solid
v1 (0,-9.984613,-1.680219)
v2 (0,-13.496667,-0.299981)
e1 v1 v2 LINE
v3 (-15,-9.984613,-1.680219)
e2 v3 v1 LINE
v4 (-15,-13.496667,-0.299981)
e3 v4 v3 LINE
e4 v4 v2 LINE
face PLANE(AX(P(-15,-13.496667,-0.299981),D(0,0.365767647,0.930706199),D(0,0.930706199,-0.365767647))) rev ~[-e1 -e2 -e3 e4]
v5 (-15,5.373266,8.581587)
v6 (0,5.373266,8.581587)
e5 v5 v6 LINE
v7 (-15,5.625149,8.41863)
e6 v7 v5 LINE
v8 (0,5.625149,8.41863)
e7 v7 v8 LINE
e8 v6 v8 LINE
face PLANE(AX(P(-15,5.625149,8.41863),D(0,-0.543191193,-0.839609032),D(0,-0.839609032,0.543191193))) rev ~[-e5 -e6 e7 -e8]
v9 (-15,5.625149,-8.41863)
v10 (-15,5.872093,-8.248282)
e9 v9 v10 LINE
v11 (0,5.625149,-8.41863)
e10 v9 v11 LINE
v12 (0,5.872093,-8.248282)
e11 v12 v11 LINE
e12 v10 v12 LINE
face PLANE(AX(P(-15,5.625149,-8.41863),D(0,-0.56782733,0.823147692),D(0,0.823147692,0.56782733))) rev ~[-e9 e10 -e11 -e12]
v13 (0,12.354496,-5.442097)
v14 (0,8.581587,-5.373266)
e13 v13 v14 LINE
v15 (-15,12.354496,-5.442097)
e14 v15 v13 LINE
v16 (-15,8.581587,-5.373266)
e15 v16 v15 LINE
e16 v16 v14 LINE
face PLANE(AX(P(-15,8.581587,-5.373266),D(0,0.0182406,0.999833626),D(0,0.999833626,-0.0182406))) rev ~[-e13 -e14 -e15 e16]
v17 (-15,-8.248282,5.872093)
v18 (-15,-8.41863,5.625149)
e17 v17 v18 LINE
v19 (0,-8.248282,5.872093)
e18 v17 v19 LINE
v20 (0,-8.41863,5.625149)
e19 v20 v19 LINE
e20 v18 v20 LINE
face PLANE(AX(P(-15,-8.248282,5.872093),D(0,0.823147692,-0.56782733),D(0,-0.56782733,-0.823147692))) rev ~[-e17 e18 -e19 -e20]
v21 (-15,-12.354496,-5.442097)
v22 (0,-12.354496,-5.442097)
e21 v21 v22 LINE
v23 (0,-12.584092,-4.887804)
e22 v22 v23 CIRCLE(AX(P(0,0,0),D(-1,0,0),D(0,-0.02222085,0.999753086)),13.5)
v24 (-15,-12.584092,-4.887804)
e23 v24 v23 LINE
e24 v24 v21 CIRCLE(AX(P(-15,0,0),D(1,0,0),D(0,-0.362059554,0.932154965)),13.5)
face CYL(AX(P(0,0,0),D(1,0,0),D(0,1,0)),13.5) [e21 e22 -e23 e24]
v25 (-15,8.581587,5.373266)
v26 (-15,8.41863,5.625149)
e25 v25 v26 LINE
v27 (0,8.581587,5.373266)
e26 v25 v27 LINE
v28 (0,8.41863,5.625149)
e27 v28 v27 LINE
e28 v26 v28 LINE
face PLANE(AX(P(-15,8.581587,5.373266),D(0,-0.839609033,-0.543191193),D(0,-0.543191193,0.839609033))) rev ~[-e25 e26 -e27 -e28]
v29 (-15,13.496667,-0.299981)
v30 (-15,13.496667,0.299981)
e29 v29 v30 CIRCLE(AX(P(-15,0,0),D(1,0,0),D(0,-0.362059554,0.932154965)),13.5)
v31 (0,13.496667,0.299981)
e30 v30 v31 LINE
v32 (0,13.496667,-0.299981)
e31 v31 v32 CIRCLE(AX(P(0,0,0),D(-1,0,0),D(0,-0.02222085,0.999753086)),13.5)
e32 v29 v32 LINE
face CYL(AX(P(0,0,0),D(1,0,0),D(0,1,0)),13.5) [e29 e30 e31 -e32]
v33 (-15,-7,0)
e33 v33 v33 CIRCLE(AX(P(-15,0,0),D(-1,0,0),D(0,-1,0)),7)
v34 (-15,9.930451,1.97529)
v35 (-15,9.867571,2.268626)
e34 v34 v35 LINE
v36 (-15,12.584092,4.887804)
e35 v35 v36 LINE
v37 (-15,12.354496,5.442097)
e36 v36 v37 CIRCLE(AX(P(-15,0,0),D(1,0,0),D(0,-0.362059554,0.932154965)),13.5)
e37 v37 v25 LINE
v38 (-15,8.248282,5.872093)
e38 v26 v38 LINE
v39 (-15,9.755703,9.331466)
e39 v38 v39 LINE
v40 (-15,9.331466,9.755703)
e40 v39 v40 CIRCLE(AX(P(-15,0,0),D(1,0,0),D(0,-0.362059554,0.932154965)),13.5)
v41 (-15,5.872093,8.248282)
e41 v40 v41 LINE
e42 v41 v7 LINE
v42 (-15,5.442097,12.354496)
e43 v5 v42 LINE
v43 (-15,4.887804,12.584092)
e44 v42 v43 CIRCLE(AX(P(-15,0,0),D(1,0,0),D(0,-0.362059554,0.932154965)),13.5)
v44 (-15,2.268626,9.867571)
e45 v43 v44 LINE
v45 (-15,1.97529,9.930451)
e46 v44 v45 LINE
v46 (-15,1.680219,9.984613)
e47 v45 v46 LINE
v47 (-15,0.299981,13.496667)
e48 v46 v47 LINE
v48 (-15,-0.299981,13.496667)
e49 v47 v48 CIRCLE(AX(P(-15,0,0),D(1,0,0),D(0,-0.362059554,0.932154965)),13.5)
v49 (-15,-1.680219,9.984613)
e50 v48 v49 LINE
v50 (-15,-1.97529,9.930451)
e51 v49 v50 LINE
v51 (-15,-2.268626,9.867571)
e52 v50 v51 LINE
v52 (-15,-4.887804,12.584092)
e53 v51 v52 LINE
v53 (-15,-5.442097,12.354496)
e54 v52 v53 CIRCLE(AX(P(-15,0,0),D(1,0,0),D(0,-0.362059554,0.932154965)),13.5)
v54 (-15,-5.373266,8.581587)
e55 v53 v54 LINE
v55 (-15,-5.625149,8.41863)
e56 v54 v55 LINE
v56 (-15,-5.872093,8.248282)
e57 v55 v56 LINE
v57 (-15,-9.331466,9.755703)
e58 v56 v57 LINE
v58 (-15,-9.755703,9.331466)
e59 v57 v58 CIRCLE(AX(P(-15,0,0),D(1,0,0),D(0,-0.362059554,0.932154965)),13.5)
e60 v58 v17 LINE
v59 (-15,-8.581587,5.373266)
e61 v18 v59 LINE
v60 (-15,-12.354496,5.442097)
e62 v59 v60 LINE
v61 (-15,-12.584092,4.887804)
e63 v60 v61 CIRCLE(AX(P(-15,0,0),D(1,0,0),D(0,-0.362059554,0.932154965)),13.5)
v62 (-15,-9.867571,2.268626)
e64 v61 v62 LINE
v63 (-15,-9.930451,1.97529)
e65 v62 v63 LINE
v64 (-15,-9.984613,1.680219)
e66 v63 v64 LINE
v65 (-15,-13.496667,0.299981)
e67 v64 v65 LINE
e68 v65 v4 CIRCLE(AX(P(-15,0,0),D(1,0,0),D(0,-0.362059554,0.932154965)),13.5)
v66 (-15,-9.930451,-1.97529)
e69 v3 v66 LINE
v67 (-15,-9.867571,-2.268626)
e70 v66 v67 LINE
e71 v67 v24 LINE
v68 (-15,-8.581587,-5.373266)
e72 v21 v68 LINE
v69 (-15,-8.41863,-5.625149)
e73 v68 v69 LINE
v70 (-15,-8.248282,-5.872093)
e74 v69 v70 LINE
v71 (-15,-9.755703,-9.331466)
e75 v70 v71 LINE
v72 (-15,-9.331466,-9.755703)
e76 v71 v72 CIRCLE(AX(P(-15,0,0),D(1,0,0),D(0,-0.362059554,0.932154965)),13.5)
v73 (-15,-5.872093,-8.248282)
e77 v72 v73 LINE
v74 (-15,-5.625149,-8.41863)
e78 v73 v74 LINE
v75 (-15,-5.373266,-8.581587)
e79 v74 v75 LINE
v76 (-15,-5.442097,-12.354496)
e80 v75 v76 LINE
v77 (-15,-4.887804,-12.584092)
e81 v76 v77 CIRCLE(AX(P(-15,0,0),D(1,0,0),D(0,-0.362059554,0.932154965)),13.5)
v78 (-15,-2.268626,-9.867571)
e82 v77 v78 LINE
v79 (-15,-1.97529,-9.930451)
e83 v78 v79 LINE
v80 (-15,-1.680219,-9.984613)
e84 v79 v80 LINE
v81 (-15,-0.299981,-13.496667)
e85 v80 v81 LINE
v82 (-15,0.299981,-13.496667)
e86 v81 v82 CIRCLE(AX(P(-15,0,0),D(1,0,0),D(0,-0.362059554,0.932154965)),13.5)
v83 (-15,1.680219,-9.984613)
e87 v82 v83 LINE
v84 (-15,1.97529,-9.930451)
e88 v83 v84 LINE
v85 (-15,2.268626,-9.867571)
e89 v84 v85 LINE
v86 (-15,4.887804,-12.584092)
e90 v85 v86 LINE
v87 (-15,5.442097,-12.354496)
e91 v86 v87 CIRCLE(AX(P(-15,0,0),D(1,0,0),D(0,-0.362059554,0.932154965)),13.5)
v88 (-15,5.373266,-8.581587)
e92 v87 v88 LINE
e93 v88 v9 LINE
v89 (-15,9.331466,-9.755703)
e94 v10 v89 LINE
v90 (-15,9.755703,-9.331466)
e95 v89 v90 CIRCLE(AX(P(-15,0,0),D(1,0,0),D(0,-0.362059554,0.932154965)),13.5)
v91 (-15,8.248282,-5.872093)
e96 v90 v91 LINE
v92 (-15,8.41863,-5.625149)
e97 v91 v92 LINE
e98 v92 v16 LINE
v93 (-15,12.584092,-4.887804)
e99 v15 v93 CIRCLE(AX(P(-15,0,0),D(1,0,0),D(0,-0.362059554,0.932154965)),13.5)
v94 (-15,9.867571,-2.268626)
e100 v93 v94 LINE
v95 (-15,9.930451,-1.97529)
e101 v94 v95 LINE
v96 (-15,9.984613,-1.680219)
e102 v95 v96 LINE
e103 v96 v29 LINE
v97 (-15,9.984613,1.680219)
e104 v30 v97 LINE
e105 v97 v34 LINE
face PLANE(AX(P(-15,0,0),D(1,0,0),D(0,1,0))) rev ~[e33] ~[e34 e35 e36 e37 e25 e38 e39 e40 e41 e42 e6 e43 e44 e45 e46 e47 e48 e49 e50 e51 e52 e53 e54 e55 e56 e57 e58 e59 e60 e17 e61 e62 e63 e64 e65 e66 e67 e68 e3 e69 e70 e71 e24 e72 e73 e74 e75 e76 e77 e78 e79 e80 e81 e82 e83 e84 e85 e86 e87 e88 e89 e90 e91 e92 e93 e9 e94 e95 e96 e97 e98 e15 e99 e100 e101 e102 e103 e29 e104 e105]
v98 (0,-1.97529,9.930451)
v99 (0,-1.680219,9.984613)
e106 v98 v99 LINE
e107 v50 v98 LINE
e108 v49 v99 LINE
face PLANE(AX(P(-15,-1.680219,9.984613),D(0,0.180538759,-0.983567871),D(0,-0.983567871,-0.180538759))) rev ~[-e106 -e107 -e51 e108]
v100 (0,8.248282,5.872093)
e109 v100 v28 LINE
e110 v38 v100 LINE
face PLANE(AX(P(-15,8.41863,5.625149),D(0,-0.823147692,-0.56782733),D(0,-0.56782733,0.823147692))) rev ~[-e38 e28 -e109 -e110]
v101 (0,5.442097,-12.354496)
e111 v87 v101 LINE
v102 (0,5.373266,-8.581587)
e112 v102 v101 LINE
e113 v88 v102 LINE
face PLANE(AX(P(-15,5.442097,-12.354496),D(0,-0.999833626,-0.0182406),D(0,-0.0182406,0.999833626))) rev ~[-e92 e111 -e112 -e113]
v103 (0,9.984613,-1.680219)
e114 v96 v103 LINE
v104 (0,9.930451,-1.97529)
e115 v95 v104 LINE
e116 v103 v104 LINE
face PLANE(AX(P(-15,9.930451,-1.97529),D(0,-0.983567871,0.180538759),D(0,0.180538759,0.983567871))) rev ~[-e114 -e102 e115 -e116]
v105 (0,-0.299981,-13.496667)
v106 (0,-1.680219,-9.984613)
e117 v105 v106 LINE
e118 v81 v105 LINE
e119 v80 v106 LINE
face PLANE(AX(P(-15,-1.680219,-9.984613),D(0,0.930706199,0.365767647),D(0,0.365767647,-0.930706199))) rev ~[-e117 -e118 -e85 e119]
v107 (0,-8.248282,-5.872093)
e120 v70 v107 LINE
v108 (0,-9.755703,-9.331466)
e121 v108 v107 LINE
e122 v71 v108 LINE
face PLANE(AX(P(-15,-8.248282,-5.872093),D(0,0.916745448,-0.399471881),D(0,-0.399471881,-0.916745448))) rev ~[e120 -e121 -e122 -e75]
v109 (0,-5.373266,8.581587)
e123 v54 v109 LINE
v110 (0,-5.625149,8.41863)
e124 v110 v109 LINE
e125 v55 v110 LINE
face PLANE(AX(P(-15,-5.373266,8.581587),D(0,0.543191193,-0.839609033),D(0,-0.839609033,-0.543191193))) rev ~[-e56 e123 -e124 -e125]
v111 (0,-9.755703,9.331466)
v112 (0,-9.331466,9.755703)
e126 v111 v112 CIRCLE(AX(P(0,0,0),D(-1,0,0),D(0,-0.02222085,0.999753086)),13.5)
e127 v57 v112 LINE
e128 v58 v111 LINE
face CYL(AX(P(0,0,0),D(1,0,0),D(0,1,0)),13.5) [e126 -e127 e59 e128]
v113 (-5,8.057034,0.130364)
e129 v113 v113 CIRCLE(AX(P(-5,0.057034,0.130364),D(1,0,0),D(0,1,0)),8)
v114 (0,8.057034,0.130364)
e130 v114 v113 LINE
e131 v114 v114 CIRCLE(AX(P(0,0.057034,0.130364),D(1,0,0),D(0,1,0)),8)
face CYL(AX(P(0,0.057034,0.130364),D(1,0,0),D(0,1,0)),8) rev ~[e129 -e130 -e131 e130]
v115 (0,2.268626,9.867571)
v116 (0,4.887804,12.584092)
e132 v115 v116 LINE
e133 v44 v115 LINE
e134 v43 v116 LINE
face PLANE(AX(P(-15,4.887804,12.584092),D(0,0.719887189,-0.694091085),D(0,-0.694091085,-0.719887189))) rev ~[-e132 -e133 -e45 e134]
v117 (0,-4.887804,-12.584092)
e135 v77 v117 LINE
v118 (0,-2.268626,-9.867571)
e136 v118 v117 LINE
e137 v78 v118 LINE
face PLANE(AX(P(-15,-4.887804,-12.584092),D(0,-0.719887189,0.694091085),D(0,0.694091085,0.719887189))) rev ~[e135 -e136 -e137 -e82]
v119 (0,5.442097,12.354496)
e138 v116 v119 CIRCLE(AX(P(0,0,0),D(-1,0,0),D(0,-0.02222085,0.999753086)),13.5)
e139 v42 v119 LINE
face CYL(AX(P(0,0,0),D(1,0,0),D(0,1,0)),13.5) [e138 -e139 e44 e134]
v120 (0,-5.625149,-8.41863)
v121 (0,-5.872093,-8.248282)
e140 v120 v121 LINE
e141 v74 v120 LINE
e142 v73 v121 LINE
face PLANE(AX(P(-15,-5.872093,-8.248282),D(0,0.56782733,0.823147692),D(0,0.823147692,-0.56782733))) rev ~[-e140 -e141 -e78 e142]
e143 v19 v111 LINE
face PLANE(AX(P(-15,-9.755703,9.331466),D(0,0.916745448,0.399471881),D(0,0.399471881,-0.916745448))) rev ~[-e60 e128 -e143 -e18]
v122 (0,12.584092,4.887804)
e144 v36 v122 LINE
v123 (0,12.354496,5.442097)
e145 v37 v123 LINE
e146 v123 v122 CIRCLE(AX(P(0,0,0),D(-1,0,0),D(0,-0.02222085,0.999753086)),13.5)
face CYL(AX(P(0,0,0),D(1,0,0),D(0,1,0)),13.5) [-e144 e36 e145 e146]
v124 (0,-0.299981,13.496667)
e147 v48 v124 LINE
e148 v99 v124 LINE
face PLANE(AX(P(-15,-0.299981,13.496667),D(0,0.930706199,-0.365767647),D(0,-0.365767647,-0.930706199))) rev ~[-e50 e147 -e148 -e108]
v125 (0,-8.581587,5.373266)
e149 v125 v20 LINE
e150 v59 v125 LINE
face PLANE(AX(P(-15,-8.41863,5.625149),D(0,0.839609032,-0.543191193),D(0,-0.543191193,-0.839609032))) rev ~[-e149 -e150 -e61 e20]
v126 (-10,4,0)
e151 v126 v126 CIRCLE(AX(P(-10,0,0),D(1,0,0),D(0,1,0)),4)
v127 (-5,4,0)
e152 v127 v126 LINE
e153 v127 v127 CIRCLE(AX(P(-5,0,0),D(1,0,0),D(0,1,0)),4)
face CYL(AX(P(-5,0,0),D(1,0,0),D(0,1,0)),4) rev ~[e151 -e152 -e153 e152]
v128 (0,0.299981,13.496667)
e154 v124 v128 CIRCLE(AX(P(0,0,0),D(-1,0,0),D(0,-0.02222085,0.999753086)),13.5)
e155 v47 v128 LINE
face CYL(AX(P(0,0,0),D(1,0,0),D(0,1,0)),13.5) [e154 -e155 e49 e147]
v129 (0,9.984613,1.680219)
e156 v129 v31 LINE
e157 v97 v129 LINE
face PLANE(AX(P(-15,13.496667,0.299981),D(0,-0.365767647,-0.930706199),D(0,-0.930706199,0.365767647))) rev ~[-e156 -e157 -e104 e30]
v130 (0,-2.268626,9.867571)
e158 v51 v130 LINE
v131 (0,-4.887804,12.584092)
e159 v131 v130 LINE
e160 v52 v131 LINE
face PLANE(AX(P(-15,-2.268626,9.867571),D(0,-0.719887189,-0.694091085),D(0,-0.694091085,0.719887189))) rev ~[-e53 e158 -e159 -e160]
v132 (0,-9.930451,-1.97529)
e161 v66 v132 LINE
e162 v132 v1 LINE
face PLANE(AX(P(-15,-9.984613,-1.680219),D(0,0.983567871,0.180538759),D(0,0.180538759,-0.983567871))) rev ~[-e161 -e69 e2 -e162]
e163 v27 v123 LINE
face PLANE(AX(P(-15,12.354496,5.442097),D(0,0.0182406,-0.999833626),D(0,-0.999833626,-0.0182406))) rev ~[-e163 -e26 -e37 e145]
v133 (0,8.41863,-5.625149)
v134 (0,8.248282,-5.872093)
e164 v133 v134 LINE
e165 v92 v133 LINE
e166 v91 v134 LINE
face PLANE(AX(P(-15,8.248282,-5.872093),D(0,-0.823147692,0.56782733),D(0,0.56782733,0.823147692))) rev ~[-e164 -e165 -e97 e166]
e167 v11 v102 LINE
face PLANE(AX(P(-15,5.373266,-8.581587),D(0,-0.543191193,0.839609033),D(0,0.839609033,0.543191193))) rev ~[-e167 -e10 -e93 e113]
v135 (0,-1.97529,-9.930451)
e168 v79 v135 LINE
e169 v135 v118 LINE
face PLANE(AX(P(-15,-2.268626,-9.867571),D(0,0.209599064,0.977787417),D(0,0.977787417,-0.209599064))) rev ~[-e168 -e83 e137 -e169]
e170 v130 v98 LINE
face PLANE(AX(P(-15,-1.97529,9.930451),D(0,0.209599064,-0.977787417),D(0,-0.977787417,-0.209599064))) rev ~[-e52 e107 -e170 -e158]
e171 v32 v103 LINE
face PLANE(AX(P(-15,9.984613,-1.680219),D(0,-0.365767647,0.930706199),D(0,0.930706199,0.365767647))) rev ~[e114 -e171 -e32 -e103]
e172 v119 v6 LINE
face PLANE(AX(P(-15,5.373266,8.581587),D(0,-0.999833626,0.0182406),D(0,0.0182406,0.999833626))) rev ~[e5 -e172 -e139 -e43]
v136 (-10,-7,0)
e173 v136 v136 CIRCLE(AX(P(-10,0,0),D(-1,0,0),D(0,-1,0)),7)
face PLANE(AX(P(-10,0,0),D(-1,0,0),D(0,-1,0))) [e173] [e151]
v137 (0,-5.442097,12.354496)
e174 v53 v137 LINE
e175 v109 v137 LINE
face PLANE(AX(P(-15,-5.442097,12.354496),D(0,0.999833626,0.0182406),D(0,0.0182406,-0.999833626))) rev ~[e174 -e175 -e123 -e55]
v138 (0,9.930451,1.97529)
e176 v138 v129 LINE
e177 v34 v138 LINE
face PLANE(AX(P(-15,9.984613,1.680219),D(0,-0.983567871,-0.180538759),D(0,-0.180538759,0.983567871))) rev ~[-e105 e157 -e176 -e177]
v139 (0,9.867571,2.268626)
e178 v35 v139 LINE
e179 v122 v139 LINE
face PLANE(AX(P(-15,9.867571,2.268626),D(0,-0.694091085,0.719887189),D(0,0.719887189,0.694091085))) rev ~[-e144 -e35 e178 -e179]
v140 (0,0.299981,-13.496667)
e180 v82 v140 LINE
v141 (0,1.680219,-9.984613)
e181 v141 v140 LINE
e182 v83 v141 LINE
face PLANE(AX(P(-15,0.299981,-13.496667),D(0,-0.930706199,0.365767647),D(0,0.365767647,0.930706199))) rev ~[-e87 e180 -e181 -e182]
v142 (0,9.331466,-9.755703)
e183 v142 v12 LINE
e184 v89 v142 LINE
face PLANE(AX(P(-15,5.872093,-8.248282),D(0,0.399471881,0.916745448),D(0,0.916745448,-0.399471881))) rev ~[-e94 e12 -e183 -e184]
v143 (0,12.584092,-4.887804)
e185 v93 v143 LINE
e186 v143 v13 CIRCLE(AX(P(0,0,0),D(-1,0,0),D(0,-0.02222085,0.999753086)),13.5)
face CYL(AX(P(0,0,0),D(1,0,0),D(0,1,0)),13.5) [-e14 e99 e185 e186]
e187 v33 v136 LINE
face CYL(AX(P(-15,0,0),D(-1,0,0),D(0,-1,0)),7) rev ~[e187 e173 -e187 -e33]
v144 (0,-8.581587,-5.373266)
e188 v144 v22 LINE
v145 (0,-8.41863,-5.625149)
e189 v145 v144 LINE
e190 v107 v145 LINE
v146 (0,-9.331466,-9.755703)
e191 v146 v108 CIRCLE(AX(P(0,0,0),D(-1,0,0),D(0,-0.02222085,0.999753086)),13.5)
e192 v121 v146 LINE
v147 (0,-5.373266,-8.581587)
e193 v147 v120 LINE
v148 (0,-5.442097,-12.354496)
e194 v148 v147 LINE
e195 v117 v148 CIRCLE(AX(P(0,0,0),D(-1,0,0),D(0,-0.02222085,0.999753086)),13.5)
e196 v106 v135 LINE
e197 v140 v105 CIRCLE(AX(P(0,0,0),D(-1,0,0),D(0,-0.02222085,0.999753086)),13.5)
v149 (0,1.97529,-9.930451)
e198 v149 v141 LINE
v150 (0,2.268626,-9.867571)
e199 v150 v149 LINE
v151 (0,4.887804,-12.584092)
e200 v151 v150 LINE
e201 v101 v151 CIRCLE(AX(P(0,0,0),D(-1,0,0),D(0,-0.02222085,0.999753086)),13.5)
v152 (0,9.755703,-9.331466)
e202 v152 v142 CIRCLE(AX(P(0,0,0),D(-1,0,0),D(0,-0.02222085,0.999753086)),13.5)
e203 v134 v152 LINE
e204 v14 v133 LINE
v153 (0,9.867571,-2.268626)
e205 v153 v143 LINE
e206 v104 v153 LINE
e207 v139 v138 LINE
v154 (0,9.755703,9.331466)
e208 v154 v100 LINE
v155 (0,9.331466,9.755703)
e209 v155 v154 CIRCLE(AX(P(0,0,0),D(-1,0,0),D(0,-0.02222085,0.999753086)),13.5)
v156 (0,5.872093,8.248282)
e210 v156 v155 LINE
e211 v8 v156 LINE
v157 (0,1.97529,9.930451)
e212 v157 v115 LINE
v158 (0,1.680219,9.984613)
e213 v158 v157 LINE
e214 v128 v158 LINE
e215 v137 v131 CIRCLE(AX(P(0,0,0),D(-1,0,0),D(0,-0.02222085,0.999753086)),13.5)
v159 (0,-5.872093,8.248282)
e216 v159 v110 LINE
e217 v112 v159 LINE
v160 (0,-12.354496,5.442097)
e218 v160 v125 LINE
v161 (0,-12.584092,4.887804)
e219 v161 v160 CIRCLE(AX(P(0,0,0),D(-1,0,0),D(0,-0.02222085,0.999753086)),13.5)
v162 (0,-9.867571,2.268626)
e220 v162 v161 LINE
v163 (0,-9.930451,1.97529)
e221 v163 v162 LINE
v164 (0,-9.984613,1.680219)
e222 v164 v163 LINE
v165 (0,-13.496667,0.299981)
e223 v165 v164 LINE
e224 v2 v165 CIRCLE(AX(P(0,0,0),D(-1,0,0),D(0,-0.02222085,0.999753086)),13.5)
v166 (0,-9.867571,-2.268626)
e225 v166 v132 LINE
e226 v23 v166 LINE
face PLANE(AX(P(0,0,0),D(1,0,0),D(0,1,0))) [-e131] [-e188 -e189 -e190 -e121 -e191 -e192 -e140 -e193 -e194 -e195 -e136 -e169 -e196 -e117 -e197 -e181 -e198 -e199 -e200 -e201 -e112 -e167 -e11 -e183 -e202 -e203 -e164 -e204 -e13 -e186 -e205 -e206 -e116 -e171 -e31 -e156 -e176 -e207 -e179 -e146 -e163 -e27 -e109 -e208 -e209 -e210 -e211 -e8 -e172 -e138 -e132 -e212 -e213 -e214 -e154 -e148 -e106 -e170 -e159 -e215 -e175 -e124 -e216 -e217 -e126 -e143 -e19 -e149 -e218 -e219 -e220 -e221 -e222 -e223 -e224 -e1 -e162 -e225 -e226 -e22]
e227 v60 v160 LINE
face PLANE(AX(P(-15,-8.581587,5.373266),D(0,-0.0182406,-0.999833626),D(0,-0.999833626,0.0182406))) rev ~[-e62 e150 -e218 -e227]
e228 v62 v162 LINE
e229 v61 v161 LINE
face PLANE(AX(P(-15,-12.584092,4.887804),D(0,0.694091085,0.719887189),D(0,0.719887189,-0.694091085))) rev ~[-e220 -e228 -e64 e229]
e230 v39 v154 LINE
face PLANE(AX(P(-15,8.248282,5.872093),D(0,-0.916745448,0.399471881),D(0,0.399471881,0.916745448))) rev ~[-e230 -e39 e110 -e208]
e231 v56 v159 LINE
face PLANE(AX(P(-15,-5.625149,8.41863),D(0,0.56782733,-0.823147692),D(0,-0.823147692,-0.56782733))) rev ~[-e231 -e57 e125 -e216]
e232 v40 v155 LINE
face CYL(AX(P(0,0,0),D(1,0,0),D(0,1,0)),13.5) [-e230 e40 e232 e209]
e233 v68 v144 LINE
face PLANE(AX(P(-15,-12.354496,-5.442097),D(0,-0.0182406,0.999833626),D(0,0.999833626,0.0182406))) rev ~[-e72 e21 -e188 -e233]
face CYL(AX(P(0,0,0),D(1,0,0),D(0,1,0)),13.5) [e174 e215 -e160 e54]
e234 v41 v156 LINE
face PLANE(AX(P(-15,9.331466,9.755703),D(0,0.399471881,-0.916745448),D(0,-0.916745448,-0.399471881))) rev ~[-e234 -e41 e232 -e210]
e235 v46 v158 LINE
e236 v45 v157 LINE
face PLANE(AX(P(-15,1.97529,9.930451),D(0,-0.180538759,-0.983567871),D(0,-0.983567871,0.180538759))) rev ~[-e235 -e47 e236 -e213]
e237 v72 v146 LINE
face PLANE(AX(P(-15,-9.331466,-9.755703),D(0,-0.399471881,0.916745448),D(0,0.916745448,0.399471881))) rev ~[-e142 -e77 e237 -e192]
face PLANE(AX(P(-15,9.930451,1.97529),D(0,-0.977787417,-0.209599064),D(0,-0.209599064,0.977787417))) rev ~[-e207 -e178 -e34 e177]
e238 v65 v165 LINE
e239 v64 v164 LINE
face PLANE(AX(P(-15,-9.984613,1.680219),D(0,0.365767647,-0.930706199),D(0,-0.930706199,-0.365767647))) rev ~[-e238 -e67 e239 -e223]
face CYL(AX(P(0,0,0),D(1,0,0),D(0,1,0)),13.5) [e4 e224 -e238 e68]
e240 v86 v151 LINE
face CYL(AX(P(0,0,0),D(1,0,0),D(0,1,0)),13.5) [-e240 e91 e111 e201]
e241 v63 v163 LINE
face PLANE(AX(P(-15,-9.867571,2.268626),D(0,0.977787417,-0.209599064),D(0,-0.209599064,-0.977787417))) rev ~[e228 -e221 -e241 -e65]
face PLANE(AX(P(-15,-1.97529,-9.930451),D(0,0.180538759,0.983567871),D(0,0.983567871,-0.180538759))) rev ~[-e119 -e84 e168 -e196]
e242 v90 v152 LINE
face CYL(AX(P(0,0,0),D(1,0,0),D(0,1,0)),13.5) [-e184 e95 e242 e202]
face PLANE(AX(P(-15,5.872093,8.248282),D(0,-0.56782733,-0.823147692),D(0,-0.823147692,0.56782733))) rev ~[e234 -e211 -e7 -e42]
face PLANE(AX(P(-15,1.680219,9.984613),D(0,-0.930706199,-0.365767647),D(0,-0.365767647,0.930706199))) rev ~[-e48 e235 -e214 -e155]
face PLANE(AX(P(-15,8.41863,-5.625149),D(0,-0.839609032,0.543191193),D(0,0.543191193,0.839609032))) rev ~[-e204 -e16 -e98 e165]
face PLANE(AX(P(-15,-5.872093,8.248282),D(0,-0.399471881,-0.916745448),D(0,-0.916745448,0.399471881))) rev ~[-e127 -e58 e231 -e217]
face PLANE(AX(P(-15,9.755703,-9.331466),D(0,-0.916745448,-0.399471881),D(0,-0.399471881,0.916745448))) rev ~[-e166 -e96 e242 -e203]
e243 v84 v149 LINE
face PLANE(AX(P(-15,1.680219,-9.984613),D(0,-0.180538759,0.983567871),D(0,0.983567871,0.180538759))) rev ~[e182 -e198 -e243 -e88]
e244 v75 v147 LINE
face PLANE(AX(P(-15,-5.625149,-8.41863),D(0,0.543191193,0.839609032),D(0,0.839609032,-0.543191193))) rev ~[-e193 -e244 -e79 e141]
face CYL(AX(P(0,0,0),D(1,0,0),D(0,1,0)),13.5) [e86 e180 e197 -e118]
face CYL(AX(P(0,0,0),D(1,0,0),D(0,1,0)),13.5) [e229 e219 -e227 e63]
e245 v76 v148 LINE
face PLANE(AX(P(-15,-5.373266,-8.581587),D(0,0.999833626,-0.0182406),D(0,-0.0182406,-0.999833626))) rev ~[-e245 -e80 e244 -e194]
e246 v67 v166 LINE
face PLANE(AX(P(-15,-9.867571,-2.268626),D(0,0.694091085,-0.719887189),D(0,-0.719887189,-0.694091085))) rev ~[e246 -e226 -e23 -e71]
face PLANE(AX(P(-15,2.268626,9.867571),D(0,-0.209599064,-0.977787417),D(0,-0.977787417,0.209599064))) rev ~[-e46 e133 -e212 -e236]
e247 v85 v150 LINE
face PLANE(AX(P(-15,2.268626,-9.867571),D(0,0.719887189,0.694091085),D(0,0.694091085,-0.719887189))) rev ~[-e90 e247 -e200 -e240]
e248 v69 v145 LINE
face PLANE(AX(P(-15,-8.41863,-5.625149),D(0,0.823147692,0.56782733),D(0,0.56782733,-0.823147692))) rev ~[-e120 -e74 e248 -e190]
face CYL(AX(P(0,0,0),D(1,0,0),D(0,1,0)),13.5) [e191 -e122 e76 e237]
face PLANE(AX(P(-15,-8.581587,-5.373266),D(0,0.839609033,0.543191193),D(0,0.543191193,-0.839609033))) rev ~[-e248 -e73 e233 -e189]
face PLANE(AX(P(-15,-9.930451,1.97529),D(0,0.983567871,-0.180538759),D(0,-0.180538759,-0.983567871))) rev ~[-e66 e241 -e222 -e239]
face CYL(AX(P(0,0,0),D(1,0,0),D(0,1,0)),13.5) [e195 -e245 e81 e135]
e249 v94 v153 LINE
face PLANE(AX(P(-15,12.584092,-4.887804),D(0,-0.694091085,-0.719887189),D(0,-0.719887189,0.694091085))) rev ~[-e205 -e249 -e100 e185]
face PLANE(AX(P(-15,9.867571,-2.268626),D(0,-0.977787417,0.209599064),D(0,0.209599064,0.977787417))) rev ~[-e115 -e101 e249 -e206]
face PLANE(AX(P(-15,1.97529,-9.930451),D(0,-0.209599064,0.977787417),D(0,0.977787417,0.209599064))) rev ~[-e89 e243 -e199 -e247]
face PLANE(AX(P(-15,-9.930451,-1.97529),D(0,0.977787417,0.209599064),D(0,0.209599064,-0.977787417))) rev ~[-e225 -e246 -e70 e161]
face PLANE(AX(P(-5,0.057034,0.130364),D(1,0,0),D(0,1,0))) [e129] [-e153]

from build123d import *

# Parameters (mm, degrees)
F0_R            = 13.5
F1_DEPTH        = 15
F2_R            = 7
F3_DEPTH        = 5
F5_DEPTH        = 15.001
F5_COPIES_COUNT = 16
F6_R            = 8
F7_DEPTH        = 5
F8_R            = 4
F9_DEPTH        = 10.001


# Not quite as in the source:
# - a pattern or mirror of a feature is missing from the dataset's text; its kind, count and spacing are read off the source's solid


with BuildPart() as f1:
    # F0 (on Right) → F1 (new body)
    with BuildSketch(Plane.YZ):
        Circle(F0_R)
    extrude(amount=-F1_DEPTH)

    # F2 (on face) → F3 (cut)
    with BuildSketch(Plane(origin=(-15, 0, 0), x_dir=(0, -1, 0), z_dir=(-1, 0, 0))):
        Circle(F2_R)
    extrude(amount=-F3_DEPTH, mode=Mode.SUBTRACT)

    # F4 (on face) → F5 (cut, through all)
    with BuildSketch(Plane(origin=(-15, 0, 0), x_dir=(0, -1, 0), z_dir=(-1, 0, 0))):
        with BuildLine():
            Line((2.2686257354, 9.8675712449), (4.8878039751, 12.5840920332))
            ThreePointArc((4.8878039751, 12.5840920332), (2.6337193472, 13.2406012854), (0.2999814809, 13.4966666667))
            Line((0.2999814809, 13.4966666667), (1.6802191492, 9.9846125919))
            Line((1.6802191492, 9.9846125919), (1.9752895104, 9.9304509641))
            Line((1.9752895104, 9.9304509641), (2.2686257354, 9.8675712449))
        make_face()
    f5 = extrude(amount=-F5_DEPTH, mode=Mode.SUBTRACT)

    # F5_copies: F5 ×16 about axis
    f5_copies_axis = Axis((0, 0, 0), (1, 0, 0))
    for i in range(1, F5_COPIES_COUNT):
        add(f5.rotate(f5_copies_axis, i * 360 / F5_COPIES_COUNT), mode=Mode.SUBTRACT)

    # F6 (on face) → F7 (cut)
    with BuildSketch(Plane.YZ):
        with Locations((0.0570340926, 0.13036374)):
            Circle(F6_R)
    extrude(amount=-F7_DEPTH, mode=Mode.SUBTRACT)

    # F8 (on face) → F9 (cut, through all)
    with BuildSketch(Plane.YZ.offset(-5)):
        Circle(F8_R)
    extrude(amount=-F9_DEPTH, mode=Mode.SUBTRACT)


solid = f1.part
